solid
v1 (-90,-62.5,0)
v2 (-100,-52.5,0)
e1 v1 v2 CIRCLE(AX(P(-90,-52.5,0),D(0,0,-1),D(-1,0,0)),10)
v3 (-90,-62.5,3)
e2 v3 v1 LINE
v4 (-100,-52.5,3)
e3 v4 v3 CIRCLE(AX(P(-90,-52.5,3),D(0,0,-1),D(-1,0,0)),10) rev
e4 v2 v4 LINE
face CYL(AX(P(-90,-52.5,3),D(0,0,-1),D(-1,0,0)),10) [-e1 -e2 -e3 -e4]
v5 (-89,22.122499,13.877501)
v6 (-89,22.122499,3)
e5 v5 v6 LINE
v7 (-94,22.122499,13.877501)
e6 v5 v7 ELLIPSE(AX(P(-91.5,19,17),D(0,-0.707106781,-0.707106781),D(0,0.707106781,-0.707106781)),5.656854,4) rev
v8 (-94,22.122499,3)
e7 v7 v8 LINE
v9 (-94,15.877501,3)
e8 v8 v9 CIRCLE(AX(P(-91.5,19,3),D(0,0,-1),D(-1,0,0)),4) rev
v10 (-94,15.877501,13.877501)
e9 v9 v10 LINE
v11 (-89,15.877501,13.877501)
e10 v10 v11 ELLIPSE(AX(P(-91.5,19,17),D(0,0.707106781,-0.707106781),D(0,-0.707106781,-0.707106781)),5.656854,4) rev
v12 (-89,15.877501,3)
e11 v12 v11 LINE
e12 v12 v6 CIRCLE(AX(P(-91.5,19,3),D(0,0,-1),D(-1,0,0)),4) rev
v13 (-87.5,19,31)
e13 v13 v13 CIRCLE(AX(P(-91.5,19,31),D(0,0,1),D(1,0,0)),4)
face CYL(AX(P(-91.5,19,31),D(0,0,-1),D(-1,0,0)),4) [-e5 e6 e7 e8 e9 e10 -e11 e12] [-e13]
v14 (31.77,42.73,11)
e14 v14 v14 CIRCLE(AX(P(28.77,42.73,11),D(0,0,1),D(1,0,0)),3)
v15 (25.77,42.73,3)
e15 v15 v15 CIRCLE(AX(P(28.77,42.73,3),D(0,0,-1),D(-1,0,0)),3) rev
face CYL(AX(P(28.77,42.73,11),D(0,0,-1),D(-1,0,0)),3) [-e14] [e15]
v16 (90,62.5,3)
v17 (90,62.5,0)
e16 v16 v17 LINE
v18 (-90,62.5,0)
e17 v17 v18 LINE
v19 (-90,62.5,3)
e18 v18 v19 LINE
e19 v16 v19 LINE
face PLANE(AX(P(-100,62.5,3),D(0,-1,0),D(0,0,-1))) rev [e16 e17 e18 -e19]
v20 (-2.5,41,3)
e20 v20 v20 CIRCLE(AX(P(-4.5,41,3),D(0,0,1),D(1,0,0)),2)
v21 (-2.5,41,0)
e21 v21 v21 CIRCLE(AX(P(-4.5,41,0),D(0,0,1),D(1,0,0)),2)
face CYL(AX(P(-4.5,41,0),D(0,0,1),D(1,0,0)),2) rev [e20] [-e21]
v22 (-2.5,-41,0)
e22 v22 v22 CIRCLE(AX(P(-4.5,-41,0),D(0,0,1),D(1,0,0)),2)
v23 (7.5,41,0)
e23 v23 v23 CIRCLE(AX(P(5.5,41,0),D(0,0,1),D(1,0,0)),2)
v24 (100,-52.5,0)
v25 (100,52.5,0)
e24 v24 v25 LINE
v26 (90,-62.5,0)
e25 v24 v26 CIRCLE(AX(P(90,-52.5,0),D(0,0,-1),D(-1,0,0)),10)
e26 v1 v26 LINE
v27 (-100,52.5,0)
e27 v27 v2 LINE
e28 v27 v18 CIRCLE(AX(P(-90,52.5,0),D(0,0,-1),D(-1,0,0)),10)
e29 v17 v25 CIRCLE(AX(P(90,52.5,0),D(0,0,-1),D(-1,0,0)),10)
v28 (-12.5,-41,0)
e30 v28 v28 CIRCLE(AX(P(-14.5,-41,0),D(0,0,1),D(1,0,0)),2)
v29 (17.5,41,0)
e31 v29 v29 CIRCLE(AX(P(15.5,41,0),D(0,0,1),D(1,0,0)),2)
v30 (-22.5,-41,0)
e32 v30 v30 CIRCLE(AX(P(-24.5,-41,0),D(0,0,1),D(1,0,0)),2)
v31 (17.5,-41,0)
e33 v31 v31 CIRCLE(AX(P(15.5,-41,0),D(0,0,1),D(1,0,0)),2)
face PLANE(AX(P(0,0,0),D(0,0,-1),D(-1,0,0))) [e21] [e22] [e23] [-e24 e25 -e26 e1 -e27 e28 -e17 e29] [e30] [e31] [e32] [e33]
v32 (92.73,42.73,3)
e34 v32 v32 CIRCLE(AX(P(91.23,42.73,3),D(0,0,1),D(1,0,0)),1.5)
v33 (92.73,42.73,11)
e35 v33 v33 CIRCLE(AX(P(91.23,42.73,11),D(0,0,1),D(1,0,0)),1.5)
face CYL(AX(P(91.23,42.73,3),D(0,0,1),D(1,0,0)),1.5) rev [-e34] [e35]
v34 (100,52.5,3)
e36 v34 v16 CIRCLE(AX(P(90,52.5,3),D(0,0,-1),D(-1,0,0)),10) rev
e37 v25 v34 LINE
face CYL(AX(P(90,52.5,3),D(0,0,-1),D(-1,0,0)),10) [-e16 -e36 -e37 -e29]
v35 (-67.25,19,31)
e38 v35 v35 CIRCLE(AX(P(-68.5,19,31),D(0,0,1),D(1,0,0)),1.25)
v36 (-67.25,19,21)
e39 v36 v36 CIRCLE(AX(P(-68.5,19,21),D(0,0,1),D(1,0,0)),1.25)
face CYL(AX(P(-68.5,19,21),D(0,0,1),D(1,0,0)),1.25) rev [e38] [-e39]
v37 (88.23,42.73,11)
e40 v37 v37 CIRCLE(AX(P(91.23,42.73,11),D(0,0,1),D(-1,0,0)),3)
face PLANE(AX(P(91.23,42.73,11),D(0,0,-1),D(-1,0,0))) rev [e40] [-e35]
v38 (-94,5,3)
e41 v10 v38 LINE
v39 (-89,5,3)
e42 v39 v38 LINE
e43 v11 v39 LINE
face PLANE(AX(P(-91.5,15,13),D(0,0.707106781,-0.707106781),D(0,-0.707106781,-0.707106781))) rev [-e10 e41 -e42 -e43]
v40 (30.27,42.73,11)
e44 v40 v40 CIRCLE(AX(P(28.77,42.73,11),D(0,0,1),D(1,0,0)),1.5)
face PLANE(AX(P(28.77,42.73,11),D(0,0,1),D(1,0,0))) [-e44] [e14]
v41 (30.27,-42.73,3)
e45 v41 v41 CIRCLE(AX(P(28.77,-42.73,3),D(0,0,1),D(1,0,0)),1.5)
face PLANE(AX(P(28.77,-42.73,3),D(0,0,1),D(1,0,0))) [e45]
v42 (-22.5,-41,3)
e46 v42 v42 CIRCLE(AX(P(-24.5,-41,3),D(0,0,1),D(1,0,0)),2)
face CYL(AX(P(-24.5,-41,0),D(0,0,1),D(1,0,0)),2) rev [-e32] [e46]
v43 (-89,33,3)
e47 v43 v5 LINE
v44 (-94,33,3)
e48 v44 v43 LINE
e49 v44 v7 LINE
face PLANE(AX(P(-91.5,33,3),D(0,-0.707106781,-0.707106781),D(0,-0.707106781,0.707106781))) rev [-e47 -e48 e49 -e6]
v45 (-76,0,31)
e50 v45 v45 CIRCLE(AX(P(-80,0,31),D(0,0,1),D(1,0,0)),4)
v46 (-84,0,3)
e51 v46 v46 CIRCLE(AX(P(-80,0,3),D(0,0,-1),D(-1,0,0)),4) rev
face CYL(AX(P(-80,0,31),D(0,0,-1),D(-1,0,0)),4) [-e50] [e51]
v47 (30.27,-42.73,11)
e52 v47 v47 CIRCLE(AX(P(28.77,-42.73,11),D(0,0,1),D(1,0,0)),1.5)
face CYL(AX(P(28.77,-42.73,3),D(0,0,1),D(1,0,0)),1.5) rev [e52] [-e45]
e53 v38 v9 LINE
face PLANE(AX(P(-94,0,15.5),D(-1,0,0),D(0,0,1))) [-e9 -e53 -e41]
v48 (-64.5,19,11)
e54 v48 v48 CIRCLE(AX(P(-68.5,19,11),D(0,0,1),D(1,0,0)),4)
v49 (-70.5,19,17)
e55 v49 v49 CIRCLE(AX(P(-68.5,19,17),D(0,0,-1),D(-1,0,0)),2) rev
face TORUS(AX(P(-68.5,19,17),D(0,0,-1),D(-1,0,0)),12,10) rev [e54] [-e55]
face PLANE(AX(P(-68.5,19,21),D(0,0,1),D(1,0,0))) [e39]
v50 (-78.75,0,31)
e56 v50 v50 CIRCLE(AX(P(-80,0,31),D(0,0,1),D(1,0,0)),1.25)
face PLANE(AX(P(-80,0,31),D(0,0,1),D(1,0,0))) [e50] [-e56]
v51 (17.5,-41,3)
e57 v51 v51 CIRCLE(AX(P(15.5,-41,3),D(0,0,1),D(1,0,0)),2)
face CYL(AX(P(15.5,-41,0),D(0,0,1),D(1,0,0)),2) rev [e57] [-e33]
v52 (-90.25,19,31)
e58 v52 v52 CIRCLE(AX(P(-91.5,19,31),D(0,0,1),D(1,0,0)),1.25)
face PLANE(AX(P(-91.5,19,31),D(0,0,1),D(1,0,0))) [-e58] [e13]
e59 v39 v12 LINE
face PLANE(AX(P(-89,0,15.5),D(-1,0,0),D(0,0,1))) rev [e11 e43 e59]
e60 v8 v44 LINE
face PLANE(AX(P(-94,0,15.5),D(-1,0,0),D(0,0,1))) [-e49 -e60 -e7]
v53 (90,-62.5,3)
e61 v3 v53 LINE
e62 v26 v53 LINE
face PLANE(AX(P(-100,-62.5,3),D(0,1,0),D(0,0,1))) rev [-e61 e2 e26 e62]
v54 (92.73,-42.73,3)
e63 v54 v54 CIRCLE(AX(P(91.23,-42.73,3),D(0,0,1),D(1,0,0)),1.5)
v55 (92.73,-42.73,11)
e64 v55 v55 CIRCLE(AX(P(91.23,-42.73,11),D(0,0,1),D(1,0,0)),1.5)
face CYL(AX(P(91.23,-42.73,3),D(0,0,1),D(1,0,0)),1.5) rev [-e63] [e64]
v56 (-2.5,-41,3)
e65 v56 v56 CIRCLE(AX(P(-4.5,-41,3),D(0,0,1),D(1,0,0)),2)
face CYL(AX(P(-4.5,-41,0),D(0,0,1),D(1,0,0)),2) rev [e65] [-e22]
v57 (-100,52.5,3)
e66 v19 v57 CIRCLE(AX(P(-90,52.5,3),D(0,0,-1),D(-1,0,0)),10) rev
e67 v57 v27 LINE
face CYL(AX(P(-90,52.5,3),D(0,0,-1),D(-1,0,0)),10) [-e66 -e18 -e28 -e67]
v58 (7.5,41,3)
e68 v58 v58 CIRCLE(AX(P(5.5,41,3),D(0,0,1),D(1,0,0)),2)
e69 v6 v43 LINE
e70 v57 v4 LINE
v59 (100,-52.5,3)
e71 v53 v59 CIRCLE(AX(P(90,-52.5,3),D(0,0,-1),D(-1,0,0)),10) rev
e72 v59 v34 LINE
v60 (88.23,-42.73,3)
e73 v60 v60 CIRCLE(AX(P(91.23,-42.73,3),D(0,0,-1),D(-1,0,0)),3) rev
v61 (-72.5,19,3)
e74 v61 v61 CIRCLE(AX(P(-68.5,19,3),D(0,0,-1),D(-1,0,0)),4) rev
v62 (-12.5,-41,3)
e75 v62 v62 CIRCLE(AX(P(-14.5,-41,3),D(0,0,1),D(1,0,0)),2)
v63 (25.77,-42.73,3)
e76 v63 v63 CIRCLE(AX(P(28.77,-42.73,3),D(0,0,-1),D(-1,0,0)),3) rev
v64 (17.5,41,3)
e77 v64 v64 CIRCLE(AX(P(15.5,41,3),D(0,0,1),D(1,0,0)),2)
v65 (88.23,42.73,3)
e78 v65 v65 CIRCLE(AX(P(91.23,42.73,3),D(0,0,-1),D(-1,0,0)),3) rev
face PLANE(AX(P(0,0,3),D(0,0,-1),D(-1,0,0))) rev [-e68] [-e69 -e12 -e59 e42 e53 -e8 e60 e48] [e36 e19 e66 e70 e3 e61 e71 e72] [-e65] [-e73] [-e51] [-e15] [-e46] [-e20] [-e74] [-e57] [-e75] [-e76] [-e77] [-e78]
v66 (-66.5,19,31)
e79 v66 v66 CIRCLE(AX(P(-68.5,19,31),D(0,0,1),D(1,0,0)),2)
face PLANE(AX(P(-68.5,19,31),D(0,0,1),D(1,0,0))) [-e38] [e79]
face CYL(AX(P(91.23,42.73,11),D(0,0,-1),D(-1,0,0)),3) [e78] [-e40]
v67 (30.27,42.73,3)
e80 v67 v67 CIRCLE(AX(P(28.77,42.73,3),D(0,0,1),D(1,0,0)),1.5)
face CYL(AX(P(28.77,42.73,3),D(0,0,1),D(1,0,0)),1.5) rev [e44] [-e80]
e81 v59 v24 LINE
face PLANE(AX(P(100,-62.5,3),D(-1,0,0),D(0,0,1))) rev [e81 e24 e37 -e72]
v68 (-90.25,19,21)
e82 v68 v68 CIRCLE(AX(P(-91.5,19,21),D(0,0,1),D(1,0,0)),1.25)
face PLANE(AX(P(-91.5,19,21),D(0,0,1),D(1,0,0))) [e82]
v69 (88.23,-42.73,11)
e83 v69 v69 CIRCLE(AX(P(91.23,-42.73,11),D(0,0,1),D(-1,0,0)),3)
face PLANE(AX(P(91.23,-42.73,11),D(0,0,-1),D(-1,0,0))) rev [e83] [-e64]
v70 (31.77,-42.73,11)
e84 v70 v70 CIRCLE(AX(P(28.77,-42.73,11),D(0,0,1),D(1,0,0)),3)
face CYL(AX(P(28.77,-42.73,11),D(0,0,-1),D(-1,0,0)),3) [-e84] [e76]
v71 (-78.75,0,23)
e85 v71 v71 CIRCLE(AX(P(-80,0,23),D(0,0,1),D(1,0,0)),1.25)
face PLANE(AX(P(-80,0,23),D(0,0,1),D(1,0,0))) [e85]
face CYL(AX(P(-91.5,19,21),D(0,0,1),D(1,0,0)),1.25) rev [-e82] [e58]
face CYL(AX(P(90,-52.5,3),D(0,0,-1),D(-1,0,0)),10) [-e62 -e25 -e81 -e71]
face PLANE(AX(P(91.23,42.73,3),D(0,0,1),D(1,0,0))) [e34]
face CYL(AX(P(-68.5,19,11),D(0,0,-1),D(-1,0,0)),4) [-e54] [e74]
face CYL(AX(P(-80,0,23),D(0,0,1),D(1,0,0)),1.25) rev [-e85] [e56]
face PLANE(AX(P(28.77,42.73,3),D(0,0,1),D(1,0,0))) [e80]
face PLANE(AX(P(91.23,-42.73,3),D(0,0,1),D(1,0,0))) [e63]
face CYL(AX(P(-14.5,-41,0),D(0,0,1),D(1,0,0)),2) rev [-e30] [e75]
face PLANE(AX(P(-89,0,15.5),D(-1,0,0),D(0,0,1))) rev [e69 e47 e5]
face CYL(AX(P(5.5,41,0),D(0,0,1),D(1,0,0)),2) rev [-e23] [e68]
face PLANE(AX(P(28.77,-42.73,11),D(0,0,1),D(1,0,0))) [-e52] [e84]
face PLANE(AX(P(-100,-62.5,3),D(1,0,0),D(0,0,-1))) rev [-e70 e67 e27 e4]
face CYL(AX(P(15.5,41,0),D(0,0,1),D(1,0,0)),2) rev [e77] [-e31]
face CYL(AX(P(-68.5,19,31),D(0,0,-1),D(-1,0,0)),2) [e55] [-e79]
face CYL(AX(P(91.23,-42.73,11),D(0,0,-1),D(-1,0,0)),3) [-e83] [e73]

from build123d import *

# Parameters (mm, degrees)
SKETCH_1_W          = 200
SKETCH_1_H          = 125
EXTRUDE_1_DEPTH     = 3
SKETCH_2_R          = 4
SKETCH_2_R_2        = 2
EXTRUDE_2_DEPTH     = 28
SKETCH_3_R          = 1.25
CUT_EXTRUDE_1_DEPTH = 10
SKETCH_4_R          = 2
CUT_EXTRUDE_2_DEPTH = 122.203341538
SKETCH_5_R          = 3
EXTRUDE_3_DEPTH     = 8
SKETCH_6_R          = 1.5
CUT_EXTRUDE_3_DEPTH = 8
FILLET_1_R          = 10
RIB_1_REACH         = 205.812
SKETCH_9_WALL_W     = 423.76696313
SKETCH_9_WALL_H     = 5
RIB_2_REACH         = 205.812
SKETCH_10_WALL_W    = 423.76696313
SKETCH_10_WALL_H    = 5
SKETCH_13_R         = 4
EXTRUDE_4_DEPTH     = 8
FILLET_3_R          = 10
SKETCH_14_R         = 1.25
CUT_EXTRUDE_4_DEPTH = 8


with BuildPart() as part:
    # 草图1 → 凸台-拉伸1 (new body)
    with BuildSketch(Plane.XY):
        Rectangle(SKETCH_1_W, SKETCH_1_H)
    extrude(amount=EXTRUDE_1_DEPTH)

    # 草图2 → 凸台-拉伸2 (add)
    with BuildSketch(Plane.XY.offset(3)):
        with Locations(Location((-91.5, 19, 0), (0, 0, 180))):
            Circle(SKETCH_2_R)
        with Locations(Location((-68.5, 19, 0), (0, 0, 180))):
            Circle(SKETCH_2_R_2)
        with Locations(Location((-80, 0, 0), (0, 0, 180))):
            Circle(SKETCH_2_R)
    extrude(amount=EXTRUDE_2_DEPTH)

    # 草图3 → 切除-拉伸1 (cut)
    with BuildSketch(Plane.XY.offset(31)):
        with Locations((-91.5, 19)):
            Circle(SKETCH_3_R)
        with Locations((-68.5, 19)):
            Circle(SKETCH_3_R)
    extrude(amount=-CUT_EXTRUDE_1_DEPTH, mode=Mode.SUBTRACT)

    # 草图4 → 切除-拉伸2 (cut, through all)
    with BuildSketch(Plane.XY.offset(3)):
        with Locations((15.5, 41)):
            Circle(SKETCH_4_R)
        with Locations((15.5, -41)):
            Circle(SKETCH_4_R)
        with Locations((5.5, 41)):
            Circle(SKETCH_4_R)
        with Locations((-4.5, 41)):
            Circle(SKETCH_4_R)
        with Locations((-14.5, -41)):
            Circle(SKETCH_4_R)
        with Locations((-24.5, -41)):
            Circle(SKETCH_4_R)
        with Locations((-4.5, -41)):
            Circle(SKETCH_4_R)
    extrude(amount=-CUT_EXTRUDE_2_DEPTH, mode=Mode.SUBTRACT)

    # 草图5 → 凸台-拉伸3 (add)
    with BuildSketch(Plane.XY.offset(3)):
        with Locations(Location((28.77, 42.73, 0), (0, 0, 180))):
            Circle(SKETCH_5_R)
        with Locations(Location((28.77, -42.73, 0), (0, 0, 180))):
            Circle(SKETCH_5_R)
        with Locations(Location((91.23, -42.73, 0), (0, 0, 180))):
            Circle(SKETCH_5_R)
        with Locations(Location((91.23, 42.73, 0), (0, 0, 180))):
            Circle(SKETCH_5_R)
    extrude(amount=EXTRUDE_3_DEPTH)

    # 草图6 → 切除-拉伸3 (cut)
    with BuildSketch(Plane.XY.offset(11)):
        with Locations((28.77, 42.73)):
            Circle(SKETCH_6_R)
        with Locations((91.23, 42.73)):
            Circle(SKETCH_6_R)
        with Locations((28.77, -42.73)):
            Circle(SKETCH_6_R)
        with Locations((91.23, -42.73)):
            Circle(SKETCH_6_R)
    extrude(amount=-CUT_EXTRUDE_3_DEPTH, mode=Mode.SUBTRACT)

    # 圆角1
    fillet_1_edges = [part.edges().sort_by_distance(p)[0] for p in [
        (100, -62.5, 1.5),
        (-100, -62.5, 1.5),
        (-100, 62.5, 1.5),
        (100, 62.5, 1.5),
    ]]
    fillet(fillet_1_edges, radius=FILLET_1_R)

    # 草图9 wall → 筋1 (add, up to next)
    with BuildSketch(Plane(origin=(-91.5, 28, 8), x_dir=(0, -0.707106781187, 0.707106781187), z_dir=(0, 0.707106781187, 0.707106781187)), mode=Mode.PRIVATE) as rib_1_sk1:
        Rectangle(SKETCH_9_WALL_W, SKETCH_9_WALL_H)
    rib_1_tool1 = extrude(rib_1_sk1.sketch, amount=-RIB_1_REACH, mode=Mode.PRIVATE) - part.part
    add(rib_1_tool1.solids().sort_by_distance((-91.5, 28, 8))[0])

    # 草图10 wall → 筋2 (add, up to next)
    with BuildSketch(Plane(origin=(-91.5, 10, 8), x_dir=(0, -0.707106781187, -0.707106781187), z_dir=(0, -0.707106781187, 0.707106781187)), mode=Mode.PRIVATE) as rib_2_sk1:
        Rectangle(SKETCH_10_WALL_W, SKETCH_10_WALL_H)
    rib_2_tool1 = extrude(rib_2_sk1.sketch, amount=-RIB_2_REACH, mode=Mode.PRIVATE) - part.part
    add(rib_2_tool1.solids().sort_by_distance((-91.5, 10, 8))[0])

    # 草图13 → 凸台-拉伸4 (add)
    with BuildSketch(Plane.XY.offset(3)):
        with Locations(Location((-68.5, 19, 0), (0, 0, 180))):
            Circle(SKETCH_13_R)
    extrude(amount=EXTRUDE_4_DEPTH)

    # 圆角3
    # the kernel refuses this fillet: 10 mm, written as the material it adds along each edge
    with BuildSketch(Plane(origin=(-68.5, 19, 11), x_dir=(-1, 0, 0), z_dir=(0, -1, 0))) as fillet_3_piece_1:
        with BuildLine():
            CenterArc((12, -6), FILLET_3_R, 143.130102354, 36.869897646)
            Line((2, -6), (1.8, -6))
            Line((1.8, -6), (1.8, 0))
            Line((1.8, 0), (2, 0.2))
            ThreePointArc((2, 0.2), (3, 0.2), (3.84, 0.12))
            Line((3.84, 0.12), (4, 0))
        make_face()
    revolve(axis=Axis((-68.5, 19, 11), (0, 0, -1)))

    # 草图14 → 切除-拉伸4 (cut)
    with BuildSketch(Plane.XY.offset(31)):
        with Locations((-80, 0)):
            Circle(SKETCH_14_R)
    extrude(amount=-CUT_EXTRUDE_4_DEPTH, mode=Mode.SUBTRACT)


solid = part.part
